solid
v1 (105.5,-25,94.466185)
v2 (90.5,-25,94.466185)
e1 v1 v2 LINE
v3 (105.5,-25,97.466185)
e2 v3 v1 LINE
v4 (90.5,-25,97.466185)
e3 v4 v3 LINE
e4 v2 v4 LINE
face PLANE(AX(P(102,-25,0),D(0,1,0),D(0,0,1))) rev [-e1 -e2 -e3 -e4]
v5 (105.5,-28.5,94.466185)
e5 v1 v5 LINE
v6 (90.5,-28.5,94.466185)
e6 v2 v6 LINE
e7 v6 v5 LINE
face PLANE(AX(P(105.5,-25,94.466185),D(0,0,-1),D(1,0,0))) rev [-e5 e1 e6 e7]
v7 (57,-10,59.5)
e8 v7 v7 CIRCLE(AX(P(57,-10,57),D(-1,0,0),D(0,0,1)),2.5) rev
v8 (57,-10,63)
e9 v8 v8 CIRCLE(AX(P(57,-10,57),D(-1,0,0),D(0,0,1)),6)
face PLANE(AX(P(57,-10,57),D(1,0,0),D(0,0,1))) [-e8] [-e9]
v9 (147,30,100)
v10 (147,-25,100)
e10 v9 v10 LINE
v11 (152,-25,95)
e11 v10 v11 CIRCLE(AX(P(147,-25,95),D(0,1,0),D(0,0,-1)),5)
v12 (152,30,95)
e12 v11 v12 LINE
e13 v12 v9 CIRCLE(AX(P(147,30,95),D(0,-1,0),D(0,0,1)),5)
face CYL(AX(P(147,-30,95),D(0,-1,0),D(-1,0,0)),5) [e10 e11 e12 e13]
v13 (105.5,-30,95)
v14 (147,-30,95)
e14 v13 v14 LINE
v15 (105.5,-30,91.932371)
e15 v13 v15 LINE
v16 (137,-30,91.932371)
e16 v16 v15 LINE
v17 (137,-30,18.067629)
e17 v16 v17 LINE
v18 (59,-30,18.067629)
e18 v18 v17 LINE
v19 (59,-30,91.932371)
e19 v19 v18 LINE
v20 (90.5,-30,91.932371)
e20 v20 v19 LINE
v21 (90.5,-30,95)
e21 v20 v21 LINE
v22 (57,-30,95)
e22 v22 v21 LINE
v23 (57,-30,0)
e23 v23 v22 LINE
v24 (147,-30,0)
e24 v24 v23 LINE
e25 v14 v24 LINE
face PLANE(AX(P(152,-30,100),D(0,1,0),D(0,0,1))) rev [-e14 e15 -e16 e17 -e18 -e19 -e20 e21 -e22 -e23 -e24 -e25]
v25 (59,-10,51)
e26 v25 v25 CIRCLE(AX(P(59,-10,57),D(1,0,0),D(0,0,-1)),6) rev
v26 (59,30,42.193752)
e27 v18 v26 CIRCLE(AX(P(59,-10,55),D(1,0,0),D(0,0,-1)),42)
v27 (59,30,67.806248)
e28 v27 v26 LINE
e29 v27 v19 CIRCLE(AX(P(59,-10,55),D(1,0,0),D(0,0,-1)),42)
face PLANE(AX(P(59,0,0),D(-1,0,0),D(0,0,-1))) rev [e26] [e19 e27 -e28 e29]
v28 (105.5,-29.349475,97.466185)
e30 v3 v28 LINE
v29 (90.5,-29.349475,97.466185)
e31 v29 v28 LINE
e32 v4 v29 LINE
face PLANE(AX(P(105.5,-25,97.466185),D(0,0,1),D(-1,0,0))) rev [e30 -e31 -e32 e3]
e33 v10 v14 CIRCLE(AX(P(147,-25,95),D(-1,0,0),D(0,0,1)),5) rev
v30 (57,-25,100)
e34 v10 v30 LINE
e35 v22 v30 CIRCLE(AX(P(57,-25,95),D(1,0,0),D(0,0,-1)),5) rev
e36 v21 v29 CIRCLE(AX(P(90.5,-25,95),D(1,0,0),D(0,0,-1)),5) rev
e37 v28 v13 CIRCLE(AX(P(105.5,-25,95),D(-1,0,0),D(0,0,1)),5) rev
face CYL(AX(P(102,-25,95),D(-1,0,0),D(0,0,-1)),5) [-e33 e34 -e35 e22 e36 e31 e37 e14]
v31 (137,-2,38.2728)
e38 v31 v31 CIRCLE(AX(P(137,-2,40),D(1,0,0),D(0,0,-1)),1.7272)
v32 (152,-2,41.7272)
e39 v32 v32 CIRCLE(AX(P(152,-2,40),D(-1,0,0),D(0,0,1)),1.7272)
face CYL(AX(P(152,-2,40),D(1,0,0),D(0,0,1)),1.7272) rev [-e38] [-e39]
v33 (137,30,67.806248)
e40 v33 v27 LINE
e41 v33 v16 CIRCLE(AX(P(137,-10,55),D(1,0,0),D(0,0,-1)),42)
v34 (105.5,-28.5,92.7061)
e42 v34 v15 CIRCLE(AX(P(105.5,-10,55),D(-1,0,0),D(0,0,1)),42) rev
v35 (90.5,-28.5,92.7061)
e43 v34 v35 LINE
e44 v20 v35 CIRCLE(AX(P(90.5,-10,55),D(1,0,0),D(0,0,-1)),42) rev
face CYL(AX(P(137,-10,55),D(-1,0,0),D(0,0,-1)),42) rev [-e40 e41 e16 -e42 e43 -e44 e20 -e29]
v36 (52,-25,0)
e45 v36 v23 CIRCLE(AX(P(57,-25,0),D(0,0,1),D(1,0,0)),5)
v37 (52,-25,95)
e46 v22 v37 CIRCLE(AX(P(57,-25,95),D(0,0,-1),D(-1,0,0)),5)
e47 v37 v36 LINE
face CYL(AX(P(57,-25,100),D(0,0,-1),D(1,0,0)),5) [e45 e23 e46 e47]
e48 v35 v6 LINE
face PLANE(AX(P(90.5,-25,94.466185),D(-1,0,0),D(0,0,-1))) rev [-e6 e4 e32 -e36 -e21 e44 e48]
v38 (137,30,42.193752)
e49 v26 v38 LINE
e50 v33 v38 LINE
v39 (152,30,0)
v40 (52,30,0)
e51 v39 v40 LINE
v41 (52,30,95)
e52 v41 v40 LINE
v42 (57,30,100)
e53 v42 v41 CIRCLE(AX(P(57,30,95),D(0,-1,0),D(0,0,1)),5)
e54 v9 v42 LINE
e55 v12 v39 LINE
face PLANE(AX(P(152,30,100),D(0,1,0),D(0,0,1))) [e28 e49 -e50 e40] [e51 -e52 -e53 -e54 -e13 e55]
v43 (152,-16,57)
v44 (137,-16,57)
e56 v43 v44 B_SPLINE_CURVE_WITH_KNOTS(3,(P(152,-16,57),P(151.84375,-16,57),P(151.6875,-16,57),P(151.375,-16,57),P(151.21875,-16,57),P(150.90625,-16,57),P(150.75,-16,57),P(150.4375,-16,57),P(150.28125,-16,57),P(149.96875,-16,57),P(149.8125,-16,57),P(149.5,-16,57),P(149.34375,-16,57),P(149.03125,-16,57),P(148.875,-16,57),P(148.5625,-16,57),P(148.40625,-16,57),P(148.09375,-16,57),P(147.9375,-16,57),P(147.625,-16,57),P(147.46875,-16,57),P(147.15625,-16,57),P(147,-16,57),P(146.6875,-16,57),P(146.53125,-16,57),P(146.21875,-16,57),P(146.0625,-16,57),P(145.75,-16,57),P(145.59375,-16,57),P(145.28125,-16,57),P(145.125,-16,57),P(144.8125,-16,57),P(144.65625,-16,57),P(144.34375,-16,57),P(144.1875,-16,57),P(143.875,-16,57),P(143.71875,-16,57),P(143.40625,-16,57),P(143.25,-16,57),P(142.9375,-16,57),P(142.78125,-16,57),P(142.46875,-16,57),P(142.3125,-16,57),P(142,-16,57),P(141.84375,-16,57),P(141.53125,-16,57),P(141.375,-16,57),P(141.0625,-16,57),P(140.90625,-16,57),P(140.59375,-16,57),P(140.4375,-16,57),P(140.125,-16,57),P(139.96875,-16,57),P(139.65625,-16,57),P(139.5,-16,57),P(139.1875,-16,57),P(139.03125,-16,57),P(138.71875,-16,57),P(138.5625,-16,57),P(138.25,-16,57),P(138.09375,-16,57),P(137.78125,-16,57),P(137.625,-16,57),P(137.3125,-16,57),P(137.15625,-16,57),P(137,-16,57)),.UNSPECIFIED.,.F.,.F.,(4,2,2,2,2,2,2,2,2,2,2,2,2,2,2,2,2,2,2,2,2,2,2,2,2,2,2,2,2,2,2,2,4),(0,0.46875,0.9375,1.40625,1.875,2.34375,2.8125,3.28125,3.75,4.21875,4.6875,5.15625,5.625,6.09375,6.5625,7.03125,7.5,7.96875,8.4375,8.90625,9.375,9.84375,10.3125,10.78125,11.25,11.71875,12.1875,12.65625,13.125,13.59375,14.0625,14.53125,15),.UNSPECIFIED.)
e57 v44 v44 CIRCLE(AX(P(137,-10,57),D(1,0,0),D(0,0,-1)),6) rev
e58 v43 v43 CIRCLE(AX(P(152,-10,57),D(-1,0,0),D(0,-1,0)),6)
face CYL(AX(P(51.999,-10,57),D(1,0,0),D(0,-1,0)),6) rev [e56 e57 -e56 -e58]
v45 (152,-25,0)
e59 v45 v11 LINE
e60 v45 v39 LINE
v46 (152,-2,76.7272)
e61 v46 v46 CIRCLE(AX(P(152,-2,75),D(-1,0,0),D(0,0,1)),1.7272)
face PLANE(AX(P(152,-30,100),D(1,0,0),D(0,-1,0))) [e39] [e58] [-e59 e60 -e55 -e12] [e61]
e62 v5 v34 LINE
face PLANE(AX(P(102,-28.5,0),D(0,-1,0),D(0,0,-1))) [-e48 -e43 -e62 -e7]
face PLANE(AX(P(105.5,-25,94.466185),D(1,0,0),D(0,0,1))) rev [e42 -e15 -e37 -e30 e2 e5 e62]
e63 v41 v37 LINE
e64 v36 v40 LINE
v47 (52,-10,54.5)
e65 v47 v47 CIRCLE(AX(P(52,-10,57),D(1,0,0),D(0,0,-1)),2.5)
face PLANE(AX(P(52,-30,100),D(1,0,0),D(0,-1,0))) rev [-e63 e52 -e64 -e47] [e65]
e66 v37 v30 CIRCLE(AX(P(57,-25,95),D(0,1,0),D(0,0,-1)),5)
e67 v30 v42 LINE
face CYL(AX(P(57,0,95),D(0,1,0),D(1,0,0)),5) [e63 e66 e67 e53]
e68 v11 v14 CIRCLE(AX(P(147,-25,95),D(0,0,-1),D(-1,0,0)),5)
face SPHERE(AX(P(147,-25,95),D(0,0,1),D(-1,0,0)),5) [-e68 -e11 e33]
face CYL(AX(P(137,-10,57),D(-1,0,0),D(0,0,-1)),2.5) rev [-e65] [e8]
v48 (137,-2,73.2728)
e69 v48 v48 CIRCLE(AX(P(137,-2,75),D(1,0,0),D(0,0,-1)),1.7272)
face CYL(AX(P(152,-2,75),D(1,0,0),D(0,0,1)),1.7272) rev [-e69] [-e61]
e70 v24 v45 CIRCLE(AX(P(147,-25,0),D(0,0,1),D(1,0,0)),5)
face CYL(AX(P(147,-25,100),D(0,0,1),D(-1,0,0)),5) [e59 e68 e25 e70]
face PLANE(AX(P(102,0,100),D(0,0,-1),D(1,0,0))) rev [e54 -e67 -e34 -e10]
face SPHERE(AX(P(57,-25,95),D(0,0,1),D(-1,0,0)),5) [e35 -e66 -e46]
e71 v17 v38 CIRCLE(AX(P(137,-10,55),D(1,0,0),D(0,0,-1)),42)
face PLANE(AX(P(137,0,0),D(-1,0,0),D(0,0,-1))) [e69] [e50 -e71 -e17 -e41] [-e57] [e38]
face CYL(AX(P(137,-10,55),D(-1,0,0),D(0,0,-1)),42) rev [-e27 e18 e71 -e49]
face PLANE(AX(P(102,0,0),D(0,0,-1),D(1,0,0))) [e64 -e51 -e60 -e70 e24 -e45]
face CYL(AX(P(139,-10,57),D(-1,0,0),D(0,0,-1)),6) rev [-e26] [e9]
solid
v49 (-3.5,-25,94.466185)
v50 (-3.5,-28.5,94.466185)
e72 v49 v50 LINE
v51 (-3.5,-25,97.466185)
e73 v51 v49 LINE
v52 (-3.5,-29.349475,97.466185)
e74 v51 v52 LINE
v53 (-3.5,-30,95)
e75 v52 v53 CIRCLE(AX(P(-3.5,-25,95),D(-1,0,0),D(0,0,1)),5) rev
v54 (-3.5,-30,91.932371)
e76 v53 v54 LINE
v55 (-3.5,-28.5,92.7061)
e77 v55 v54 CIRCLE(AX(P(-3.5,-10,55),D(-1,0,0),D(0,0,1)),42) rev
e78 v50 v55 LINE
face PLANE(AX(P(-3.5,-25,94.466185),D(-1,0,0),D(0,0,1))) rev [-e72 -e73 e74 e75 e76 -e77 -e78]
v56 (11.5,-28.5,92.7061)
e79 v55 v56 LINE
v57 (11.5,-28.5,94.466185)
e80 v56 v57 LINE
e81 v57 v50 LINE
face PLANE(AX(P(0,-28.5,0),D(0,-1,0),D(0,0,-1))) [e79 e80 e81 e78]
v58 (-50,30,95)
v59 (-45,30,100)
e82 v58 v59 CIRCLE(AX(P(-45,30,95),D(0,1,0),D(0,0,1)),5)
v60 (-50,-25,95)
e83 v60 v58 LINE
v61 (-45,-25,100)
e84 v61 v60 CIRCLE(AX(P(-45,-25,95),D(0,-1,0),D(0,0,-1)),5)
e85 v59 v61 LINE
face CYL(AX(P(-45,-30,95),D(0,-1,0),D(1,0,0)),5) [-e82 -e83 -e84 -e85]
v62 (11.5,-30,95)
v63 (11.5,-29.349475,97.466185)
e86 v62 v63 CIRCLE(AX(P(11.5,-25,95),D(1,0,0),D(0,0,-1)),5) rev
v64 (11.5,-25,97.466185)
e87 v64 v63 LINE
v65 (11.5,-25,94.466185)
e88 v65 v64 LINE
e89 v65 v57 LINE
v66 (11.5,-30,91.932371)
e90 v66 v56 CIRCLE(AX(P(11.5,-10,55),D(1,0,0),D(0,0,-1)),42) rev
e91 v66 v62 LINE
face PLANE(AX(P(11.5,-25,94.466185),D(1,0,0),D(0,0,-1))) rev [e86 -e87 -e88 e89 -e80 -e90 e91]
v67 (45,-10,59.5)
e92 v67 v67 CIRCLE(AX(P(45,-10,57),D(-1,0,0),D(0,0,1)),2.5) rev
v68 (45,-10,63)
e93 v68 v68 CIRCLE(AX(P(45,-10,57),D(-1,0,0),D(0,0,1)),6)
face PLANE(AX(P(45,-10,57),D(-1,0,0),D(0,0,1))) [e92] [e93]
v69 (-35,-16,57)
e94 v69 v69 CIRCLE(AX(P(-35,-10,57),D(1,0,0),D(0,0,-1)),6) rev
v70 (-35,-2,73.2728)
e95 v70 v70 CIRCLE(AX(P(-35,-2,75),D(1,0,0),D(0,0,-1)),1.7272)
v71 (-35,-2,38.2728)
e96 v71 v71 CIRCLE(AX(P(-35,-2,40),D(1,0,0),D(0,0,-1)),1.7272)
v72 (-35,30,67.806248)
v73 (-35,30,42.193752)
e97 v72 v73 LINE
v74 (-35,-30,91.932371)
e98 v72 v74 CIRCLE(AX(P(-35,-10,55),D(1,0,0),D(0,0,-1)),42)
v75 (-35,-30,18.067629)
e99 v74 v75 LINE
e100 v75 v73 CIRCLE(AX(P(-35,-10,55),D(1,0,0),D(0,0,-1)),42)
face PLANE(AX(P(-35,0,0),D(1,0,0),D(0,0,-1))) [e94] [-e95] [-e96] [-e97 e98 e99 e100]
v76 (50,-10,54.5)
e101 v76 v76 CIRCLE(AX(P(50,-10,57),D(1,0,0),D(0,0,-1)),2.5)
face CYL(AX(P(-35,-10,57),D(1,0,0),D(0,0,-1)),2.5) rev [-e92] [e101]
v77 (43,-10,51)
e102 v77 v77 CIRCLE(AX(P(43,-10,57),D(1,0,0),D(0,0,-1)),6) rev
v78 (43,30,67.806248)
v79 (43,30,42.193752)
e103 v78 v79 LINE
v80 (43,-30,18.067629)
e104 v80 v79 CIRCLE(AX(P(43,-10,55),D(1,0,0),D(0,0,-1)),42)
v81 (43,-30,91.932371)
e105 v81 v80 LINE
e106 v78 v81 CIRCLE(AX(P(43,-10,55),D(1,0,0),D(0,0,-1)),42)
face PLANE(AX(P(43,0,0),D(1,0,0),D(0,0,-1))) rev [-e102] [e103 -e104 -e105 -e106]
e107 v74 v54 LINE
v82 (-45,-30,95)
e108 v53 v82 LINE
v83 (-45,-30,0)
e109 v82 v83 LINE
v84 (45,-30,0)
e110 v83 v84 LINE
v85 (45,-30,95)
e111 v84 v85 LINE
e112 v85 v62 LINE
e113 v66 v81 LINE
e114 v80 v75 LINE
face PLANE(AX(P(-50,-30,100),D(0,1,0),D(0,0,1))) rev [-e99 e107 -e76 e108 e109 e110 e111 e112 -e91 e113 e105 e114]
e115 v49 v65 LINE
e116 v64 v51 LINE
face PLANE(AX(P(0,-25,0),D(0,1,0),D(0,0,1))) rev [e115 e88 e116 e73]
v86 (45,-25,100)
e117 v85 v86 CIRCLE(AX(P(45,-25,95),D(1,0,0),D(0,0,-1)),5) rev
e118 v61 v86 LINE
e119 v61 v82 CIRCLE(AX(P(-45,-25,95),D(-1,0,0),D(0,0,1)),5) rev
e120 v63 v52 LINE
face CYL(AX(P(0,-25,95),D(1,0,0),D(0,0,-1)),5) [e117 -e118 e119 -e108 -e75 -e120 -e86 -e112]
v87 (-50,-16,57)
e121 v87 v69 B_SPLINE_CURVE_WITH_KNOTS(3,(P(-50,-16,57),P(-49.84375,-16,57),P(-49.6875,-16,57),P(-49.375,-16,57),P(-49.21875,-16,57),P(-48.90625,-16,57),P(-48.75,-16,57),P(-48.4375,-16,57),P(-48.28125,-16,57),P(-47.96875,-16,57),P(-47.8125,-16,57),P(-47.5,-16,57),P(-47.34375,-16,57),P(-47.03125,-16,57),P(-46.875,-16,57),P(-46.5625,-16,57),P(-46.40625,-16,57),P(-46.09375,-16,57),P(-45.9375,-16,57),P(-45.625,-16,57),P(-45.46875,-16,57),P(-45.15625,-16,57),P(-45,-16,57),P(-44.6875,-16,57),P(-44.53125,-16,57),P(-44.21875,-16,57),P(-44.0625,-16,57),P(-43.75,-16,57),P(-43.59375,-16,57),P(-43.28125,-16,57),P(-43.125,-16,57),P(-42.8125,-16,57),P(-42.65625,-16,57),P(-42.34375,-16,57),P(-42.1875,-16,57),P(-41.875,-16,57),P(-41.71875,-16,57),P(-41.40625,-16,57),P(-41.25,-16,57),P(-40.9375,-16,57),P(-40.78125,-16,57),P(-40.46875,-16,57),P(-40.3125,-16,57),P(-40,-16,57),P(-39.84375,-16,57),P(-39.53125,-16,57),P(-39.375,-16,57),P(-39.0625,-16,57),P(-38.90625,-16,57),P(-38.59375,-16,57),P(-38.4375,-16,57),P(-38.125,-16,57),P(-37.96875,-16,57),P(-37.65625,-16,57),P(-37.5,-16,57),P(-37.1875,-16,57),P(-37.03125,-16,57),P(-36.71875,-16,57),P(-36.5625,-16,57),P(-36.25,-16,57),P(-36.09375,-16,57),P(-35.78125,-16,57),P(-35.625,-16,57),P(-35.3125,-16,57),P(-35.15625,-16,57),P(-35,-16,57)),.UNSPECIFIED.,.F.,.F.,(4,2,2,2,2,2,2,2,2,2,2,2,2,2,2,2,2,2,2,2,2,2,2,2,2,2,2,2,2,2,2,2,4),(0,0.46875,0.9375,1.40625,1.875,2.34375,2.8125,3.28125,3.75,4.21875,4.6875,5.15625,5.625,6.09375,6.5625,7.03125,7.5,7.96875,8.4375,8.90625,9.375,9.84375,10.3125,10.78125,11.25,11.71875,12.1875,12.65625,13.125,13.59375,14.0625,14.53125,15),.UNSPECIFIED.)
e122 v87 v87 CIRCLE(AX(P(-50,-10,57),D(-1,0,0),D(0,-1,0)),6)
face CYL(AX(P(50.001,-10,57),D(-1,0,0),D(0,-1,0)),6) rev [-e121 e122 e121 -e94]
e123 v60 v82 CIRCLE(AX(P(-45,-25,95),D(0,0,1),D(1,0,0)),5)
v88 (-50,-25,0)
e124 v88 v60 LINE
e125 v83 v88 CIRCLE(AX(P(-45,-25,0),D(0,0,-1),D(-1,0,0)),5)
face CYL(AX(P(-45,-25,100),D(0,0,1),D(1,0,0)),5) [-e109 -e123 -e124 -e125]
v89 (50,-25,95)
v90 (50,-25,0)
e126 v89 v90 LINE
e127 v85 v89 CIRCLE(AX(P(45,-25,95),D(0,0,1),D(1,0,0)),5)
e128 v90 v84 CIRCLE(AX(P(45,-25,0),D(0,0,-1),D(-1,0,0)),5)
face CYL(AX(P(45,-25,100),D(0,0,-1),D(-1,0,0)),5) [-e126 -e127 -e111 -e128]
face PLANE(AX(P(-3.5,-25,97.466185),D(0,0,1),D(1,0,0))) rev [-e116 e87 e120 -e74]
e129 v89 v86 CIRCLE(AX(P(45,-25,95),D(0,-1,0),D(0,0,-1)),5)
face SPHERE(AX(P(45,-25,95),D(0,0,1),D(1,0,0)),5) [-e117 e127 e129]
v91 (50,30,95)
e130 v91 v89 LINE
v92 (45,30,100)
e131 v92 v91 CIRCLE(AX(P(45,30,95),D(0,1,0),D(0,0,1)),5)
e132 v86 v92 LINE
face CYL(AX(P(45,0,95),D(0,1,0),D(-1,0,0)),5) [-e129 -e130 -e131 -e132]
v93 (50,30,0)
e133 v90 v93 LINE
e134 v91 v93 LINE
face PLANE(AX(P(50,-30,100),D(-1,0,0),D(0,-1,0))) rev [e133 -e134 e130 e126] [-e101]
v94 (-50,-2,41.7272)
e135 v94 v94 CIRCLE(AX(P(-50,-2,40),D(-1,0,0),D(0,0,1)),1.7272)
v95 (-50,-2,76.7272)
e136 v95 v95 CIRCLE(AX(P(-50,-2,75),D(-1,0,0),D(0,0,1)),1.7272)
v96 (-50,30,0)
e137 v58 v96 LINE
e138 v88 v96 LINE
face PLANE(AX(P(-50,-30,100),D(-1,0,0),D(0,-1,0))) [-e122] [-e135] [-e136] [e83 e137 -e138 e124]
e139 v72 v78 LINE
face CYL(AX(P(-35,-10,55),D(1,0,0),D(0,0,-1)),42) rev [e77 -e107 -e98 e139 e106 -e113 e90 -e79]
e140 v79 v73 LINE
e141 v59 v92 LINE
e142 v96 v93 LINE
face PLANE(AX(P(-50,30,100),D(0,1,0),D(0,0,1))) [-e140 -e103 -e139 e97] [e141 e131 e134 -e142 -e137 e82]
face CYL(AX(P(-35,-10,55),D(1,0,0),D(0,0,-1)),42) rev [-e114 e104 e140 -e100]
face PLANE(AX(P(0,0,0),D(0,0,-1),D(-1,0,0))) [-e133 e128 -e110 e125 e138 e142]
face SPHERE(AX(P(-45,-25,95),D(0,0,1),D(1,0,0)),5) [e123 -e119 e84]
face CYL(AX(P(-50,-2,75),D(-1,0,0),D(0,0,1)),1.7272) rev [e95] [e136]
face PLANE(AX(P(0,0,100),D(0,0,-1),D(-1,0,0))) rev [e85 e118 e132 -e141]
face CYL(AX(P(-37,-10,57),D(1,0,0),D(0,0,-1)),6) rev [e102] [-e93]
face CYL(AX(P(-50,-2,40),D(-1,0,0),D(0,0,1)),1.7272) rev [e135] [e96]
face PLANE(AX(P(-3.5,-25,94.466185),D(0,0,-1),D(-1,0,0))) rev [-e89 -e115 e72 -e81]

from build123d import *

# Parameters (mm, degrees)
SKETCH1_W                     = 100
SKETCH1_H                     = 60
BOSS_EXTRUDE1_DEPTH           = 100
CUT_EXTRUDE3_START            = -35
CUT_EXTRUDE3_DEPTH            = 78
CUT_EXTRUDE4_START            = -50
CUT_EXTRUDE4_OUTLINE_R        = 2.5
CUT_EXTRUDE4_DEPTH            = 100
CUT_EXTRUDE5_REACH            = 146.568
SKETCH3_R                     = 6
TAP_DRILL_FOR_8_32_TAP1_D     = 3.4544
TAP_DRILL_FOR_8_32_TAP1_DEPTH = 20
TAP_DRILL_FOR_8_32_TAP1_TIP   = 1.037806461
CUT_EXTRUDE6_DEPTH            = 80
CUT_EXTRUDE6_DEPTH_BACK       = 2
SKETCH7_R                     = 6
SKETCH8_W                     = 15
SKETCH8_H                     = 3
CUT_EXTRUDE7_DEPTH            = 5
SKETCH9_W                     = 15
SKETCH9_H                     = 2.533814688
CUT_EXTRUDE8_DEPTH            = 1.5
FILLET1_R                     = 5


# Read off the part's stored shape, not the designer's step: Cut-Extrude3, Cut-Extrude4
with BuildPart() as part:
    # Sketch1 → Boss-Extrude1 (new body)
    with BuildSketch(Plane.XY):
        Rectangle(SKETCH1_W, SKETCH1_H)
    extrude(amount=BOSS_EXTRUDE1_DEPTH)

    # Cut-Extrude3 outline → Cut-Extrude3 (cut)
    with BuildSketch(Plane.YZ.offset(CUT_EXTRUDE3_START)):
        with BuildLine():
            Line((30, 42.193751525), (30, 67.806248475))
            ThreePointArc((30, 67.806248475), (5.668996219, 93.96771173), (-30, 91.932370625))
            Line((-30, 91.932370625), (-30, 18.067629375))
            ThreePointArc((-30, 18.067629375), (5.668996219, 16.03228827), (30, 42.193751525))
        make_face()
    extrude(amount=CUT_EXTRUDE3_DEPTH, mode=Mode.SUBTRACT)

    # Cut-Extrude4 outline → Cut-Extrude4 (cut)
    with BuildSketch(Plane.YZ.offset(CUT_EXTRUDE4_START)):
        with Locations((-10, 57)):
            Circle(CUT_EXTRUDE4_OUTLINE_R)
    extrude(amount=CUT_EXTRUDE4_DEPTH, mode=Mode.SUBTRACT)

    # Sketch3 → Cut-Extrude5 (cut, up to next)
    with BuildSketch(Plane.ZY.offset(50), mode=Mode.PRIVATE) as cut_extrude5_sk1:
        with Locations(Location((57, -10, 0), (0, 0, 270))):
            Circle(SKETCH3_R)
    cut_extrude5_tool1 = extrude(cut_extrude5_sk1.sketch, amount=-CUT_EXTRUDE5_REACH, mode=Mode.PRIVATE) & part.part
    add(cut_extrude5_tool1.solids().sort_by_distance((-50, -10, 57))[0], mode=Mode.SUBTRACT)

    # Tap Drill for #8-32 Tap1
    with Locations(Plane.ZY.offset(50)):
        with Locations((75, -2), (40, -2)):
            Hole(TAP_DRILL_FOR_8_32_TAP1_D / 2, depth=TAP_DRILL_FOR_8_32_TAP1_DEPTH)
            with Locations((0, 0, -(TAP_DRILL_FOR_8_32_TAP1_DEPTH + TAP_DRILL_FOR_8_32_TAP1_TIP / 2))):  # 118° drill point
                Cone(0, TAP_DRILL_FOR_8_32_TAP1_D / 2, TAP_DRILL_FOR_8_32_TAP1_TIP, mode=Mode.SUBTRACT)

    # Sketch7 → Cut-Extrude6 (cut, two sides: drawn at the far end of the back side and taken through both)
    with BuildSketch(Plane.ZY.offset(-43).offset(-CUT_EXTRUDE6_DEPTH_BACK)):
        with Locations(Location((57, -10, 0), (0, 0, 270))):
            Circle(SKETCH7_R)
    extrude(amount=CUT_EXTRUDE6_DEPTH + CUT_EXTRUDE6_DEPTH_BACK, mode=Mode.SUBTRACT)

    # Sketch8 → Cut-Extrude7 (cut)
    with BuildSketch(Plane.XZ.offset(30)):
        with Locations((4, 95.966185313)):
            Rectangle(SKETCH8_W, SKETCH8_H)
    extrude(amount=-CUT_EXTRUDE7_DEPTH, mode=Mode.SUBTRACT)

    # Sketch9 → Cut-Extrude8 (cut)
    with BuildSketch(Plane(origin=(0, -30, 0), x_dir=(-1, 0, 0), z_dir=(0, -1, 0))):
        with Locations((-4, -93.199277969)):
            Rectangle(SKETCH9_W, SKETCH9_H)
    extrude(amount=-CUT_EXTRUDE8_DEPTH, mode=Mode.SUBTRACT)

    # Fillet1
    # the kernel refuses this fillet: 5 mm, written as the material it takes off along each edge
    with BuildSketch(Plane(origin=(-45, -25, 95), x_dir=(0, 0, 1), z_dir=(0, -1, 0))) as fillet1_piece_1_section:
        Polygon((0, 0), (FILLET1_R, 0), (FILLET1_R, FILLET1_R), (0, FILLET1_R), align=None)
    fillet1_piece_1 = extrude(amount=FILLET1_R, mode=Mode.PRIVATE)
    fillet1_piece_1 = fillet1_piece_1 - Plane(origin=(-45, -25, 95), x_dir=(0.7071067811865475, 0, -0.7071067811865475), z_dir=(0, -1, 0)) * Sphere(FILLET1_R, mode=Mode.PRIVATE)
    add(fillet1_piece_1, mode=Mode.SUBTRACT)
    with BuildSketch(Plane(origin=(45, -25, 95), x_dir=(1, 0, 0), z_dir=(0, -1, 0))) as fillet1_piece_2_section:
        Polygon((0, 0), (FILLET1_R, 0), (FILLET1_R, FILLET1_R), (0, FILLET1_R), align=None)
    fillet1_piece_2 = extrude(amount=FILLET1_R, mode=Mode.PRIVATE)
    fillet1_piece_2 = fillet1_piece_2 - Plane(origin=(45, -25, 95), x_dir=(-0.7071067811865475, 0, -0.7071067811865475), z_dir=(0, -1, 0)) * Sphere(FILLET1_R, mode=Mode.PRIVATE)
    add(fillet1_piece_2, mode=Mode.SUBTRACT)
    with BuildSketch(Plane(origin=(-45, -30, 100), x_dir=(0, 0, -1), z_dir=(1, 0, 0))) as fillet1_piece_3:
        with BuildLine():
            CenterArc((FILLET1_R, FILLET1_R), FILLET1_R, 180, 90)
            Line((0, FILLET1_R), (0, 0))
            Line((0, 0), (FILLET1_R, 0))
        make_face()
    extrude(amount=90, mode=Mode.SUBTRACT)
    with BuildSketch(Plane(origin=(50, -30, -12.5), x_dir=(-1, 0, 0), z_dir=(0, 0, 1))) as fillet1_piece_4:
        with BuildLine():
            CenterArc((FILLET1_R, -FILLET1_R), FILLET1_R, 90, 90)
            Line((0, -FILLET1_R), (0, 0))
            Line((0, 0), (FILLET1_R, 0))
        make_face()
    extrude(amount=107.5, mode=Mode.SUBTRACT)
    with BuildSketch(Plane(origin=(-50, -30, -12.5), x_dir=(1, 0, 0), z_dir=(0, 0, 1))) as fillet1_piece_5:
        with BuildLine():
            CenterArc((FILLET1_R, FILLET1_R), FILLET1_R, 180, 90)
            Line((0, FILLET1_R), (0, 0))
            Line((0, 0), (FILLET1_R, 0))
        make_face()
    extrude(amount=107.5, mode=Mode.SUBTRACT)
    with BuildSketch(Plane(origin=(50, -25, 100), x_dir=(0, 0, -1), z_dir=(0, 1, 0))) as fillet1_piece_6:
        with BuildLine():
            CenterArc((FILLET1_R, FILLET1_R), FILLET1_R, 180, 90)
            Line((0, FILLET1_R), (0, 0))
            Line((0, 0), (FILLET1_R, 0))
        make_face()
    extrude(amount=67.5, mode=Mode.SUBTRACT)
    with BuildSketch(Plane(origin=(-50, 42.5, 100), x_dir=(1, 0, 0), z_dir=(0, -1, 0))) as fillet1_piece_7:
        with BuildLine():
            CenterArc((FILLET1_R, -FILLET1_R), FILLET1_R, 90, 90)
            Line((0, -FILLET1_R), (0, 0))
            Line((0, 0), (FILLET1_R, 0))
        make_face()
    extrude(amount=67.5, mode=Mode.SUBTRACT)


with BuildPart() as body_2:
    # Mirror5: mirrored copy
    add(part.part.mirror(Plane(origin=(51, 0, 0), x_dir=(0, 0, 1), z_dir=(1, 0, 0))))


solid = Compound([part.part, body_2.part])
